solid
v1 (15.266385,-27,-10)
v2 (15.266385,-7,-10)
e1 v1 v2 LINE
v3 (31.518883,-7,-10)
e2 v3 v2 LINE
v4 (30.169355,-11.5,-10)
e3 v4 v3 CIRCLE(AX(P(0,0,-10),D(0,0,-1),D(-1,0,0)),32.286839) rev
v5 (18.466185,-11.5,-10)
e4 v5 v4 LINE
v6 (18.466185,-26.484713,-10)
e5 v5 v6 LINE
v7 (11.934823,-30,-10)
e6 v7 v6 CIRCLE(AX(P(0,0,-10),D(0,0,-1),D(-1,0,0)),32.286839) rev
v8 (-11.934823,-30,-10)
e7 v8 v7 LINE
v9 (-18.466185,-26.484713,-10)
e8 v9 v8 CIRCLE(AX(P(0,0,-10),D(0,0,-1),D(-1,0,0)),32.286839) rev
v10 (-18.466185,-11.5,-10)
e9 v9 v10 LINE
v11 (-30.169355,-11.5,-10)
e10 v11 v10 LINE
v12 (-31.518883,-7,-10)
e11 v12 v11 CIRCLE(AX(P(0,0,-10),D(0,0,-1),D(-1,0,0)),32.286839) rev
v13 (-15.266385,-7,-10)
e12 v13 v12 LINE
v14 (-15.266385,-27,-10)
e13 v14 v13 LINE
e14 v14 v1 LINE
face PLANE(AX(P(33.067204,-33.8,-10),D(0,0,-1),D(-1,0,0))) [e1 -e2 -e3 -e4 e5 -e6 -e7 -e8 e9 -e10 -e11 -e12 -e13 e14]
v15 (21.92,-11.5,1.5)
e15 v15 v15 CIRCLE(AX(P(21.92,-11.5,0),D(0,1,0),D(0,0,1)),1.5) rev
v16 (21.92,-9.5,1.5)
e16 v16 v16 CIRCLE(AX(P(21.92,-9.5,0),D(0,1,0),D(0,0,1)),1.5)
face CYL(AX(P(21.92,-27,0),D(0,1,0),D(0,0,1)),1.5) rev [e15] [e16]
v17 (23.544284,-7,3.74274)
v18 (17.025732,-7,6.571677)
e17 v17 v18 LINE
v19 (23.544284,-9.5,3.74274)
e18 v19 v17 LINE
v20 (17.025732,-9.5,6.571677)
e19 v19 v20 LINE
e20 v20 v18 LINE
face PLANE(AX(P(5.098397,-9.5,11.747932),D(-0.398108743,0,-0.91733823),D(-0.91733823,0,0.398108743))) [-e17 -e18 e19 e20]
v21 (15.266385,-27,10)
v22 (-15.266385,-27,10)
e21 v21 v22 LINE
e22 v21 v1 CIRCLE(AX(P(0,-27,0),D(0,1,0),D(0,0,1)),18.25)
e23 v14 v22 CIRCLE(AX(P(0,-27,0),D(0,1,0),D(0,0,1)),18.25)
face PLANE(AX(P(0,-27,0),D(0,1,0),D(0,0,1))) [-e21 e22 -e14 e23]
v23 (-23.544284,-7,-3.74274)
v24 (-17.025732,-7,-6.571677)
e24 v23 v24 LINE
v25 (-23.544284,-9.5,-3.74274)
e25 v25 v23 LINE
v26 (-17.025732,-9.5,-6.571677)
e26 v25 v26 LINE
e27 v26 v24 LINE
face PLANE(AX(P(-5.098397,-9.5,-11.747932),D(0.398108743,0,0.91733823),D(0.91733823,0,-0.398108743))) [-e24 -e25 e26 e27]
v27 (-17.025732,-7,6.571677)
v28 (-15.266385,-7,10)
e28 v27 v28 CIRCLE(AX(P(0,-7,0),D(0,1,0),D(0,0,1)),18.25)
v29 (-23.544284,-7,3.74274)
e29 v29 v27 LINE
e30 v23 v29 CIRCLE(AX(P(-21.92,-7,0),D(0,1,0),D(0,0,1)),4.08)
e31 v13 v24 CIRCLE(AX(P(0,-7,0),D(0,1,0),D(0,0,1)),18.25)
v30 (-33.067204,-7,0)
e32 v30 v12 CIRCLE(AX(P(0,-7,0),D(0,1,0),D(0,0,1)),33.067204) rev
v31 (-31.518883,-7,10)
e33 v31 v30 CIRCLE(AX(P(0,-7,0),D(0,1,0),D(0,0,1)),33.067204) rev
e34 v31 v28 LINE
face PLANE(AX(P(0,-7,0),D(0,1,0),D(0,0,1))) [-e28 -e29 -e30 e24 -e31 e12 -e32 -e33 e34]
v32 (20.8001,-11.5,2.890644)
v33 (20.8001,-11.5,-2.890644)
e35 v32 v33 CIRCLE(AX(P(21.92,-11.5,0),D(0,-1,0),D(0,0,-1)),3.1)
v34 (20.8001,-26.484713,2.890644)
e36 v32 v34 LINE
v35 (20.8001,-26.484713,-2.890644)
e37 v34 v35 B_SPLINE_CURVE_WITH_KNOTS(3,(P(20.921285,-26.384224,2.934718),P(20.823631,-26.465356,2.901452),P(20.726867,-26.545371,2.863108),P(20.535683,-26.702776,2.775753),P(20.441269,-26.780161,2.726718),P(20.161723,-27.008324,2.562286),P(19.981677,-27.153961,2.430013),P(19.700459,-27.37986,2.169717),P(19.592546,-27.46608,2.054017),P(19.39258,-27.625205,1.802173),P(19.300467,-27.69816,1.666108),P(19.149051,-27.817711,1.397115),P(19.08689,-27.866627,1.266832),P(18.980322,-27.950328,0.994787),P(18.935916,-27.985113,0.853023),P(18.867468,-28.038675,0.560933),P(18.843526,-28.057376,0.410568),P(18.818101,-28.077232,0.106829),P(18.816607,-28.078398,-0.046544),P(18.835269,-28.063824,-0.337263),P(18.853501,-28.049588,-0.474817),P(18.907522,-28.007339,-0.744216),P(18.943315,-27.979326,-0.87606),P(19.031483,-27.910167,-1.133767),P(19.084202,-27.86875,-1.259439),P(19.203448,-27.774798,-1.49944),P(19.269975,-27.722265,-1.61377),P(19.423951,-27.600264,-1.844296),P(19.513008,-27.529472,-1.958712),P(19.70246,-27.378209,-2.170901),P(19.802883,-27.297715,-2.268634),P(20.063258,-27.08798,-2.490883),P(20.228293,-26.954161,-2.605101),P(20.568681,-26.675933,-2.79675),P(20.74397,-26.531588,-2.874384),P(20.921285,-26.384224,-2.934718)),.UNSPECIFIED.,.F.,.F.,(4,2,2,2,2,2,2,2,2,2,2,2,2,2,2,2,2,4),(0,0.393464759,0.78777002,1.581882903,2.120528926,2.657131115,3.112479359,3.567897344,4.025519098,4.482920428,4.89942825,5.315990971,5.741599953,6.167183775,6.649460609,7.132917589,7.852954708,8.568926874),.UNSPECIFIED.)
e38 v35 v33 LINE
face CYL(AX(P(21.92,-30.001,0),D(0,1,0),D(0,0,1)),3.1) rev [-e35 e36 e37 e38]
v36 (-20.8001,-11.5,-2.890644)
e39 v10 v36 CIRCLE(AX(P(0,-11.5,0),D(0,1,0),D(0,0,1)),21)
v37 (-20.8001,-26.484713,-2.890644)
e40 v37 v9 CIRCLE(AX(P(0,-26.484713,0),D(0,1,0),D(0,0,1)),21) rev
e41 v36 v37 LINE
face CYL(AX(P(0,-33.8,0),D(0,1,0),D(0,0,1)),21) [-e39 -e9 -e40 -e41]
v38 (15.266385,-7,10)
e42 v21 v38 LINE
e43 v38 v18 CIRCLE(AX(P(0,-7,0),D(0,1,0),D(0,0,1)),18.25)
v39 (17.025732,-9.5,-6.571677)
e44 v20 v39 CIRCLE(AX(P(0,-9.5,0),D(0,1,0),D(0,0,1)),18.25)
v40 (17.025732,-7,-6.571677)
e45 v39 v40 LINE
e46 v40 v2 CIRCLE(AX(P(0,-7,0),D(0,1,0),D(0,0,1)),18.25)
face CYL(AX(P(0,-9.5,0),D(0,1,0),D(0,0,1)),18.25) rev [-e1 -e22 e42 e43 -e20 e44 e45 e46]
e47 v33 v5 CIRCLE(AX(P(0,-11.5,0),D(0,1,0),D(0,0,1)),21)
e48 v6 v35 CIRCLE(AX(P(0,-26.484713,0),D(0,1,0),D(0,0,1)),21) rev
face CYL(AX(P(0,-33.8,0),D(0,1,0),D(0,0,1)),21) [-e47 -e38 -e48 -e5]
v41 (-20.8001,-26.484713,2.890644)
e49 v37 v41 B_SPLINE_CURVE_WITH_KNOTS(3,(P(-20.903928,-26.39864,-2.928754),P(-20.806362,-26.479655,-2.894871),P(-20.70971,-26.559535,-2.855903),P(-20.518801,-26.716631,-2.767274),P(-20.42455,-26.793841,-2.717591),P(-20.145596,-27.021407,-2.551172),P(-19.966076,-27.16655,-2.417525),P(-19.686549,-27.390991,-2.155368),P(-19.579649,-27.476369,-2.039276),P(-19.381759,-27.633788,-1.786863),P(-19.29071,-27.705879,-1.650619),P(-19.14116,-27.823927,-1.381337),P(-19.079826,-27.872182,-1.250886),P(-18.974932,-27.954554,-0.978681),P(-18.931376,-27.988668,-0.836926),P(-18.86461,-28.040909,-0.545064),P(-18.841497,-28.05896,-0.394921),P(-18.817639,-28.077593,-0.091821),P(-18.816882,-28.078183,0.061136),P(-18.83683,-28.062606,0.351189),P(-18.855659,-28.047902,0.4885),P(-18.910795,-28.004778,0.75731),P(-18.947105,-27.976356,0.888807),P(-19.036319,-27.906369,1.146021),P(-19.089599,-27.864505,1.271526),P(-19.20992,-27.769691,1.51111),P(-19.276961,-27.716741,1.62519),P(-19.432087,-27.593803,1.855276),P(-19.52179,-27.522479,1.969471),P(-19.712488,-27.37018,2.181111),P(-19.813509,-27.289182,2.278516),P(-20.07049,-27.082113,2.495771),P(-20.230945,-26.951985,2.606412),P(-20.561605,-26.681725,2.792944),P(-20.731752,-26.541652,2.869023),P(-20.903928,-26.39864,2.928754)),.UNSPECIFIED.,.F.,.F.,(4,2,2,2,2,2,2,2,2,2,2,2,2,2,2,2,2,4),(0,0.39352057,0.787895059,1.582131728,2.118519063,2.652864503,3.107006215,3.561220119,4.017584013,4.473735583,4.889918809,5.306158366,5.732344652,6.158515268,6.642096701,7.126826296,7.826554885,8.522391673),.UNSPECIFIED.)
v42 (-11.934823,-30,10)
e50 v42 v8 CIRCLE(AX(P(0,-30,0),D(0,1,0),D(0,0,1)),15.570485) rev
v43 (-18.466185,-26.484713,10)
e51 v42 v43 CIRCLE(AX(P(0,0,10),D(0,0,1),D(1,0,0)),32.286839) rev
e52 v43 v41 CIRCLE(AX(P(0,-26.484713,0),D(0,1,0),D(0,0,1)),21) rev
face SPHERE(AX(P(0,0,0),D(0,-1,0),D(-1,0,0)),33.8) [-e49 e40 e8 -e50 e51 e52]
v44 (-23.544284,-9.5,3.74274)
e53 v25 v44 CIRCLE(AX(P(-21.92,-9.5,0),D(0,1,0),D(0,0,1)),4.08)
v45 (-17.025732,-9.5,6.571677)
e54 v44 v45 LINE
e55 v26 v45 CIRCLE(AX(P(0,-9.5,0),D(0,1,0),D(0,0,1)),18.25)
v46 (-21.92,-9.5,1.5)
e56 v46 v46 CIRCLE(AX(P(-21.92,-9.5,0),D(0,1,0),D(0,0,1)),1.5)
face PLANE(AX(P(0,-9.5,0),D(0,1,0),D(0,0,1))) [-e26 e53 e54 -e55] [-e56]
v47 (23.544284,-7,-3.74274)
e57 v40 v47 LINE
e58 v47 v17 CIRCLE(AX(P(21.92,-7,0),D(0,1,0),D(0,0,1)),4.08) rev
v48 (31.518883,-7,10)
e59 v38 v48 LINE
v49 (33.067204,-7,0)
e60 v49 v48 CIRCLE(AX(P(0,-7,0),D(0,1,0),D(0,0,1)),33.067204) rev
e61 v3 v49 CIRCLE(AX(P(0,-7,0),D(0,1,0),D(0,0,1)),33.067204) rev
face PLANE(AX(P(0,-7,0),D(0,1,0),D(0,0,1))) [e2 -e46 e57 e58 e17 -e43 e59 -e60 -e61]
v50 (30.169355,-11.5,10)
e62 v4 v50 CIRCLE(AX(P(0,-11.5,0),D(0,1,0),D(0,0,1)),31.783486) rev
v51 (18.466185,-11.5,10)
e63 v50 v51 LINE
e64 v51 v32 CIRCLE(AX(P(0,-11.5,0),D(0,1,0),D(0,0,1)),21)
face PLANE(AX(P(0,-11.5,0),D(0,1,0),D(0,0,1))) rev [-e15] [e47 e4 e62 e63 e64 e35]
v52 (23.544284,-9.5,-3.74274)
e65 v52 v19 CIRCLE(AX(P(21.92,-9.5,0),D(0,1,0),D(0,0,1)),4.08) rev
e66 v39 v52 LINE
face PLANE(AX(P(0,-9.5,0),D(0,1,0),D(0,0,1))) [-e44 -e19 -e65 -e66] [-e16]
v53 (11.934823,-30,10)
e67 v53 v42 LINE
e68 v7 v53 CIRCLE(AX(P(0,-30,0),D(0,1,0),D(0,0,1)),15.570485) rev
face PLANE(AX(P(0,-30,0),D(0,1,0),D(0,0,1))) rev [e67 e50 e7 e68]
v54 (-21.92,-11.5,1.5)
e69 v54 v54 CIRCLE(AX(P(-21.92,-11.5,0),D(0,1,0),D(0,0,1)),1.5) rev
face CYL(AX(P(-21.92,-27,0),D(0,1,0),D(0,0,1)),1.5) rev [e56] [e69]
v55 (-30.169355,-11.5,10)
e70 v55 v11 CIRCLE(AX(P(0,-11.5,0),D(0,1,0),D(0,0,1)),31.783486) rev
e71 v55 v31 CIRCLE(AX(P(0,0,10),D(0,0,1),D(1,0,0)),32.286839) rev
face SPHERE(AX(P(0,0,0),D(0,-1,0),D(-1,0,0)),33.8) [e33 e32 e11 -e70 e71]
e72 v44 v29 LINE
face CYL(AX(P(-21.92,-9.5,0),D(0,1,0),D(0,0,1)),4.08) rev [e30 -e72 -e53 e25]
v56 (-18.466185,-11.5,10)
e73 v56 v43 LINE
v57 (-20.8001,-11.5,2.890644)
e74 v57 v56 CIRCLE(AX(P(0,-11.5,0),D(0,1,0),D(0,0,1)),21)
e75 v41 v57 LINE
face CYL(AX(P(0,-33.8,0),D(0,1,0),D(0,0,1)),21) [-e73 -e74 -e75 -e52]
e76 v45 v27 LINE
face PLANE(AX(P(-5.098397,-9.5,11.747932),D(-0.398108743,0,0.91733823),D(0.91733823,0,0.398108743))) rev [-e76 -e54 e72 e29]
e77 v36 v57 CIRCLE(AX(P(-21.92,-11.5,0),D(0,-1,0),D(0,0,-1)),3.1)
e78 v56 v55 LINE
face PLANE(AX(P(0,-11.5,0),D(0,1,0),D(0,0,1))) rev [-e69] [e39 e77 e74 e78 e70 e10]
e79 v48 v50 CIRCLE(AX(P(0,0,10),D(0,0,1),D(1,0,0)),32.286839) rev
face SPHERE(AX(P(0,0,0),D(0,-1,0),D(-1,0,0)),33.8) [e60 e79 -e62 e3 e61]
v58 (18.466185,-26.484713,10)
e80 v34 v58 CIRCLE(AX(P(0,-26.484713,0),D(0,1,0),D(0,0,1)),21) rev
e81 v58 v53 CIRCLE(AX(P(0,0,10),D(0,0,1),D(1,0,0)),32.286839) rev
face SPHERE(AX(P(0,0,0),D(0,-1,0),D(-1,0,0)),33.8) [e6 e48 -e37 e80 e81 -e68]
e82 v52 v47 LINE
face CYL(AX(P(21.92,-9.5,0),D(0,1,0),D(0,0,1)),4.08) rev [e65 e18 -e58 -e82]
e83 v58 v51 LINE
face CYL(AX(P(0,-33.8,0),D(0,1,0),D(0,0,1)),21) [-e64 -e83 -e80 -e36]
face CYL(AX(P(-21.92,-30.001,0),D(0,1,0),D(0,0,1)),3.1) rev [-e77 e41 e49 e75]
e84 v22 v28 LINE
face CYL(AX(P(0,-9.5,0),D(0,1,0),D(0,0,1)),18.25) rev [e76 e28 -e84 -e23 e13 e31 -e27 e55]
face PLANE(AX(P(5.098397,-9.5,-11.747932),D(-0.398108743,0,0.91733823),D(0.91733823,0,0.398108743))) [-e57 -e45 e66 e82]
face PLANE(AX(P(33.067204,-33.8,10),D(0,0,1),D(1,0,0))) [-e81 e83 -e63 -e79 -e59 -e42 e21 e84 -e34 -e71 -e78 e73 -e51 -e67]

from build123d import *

# Parameters (mm, degrees)
SKETCH2_R               = 33.8
CUT_EXTRUDE1_DEPTH      = 7
SKETCH3_OUTSIDE_W       = 87.592
SKETCH3_OUTSIDE_H       = 87.592
SKETCH3_OUTSIDE_W_2     = 66.134408594
SKETCH3_OUTSIDE_H_2     = 20
CUT_EXTRUDE2_DEPTH      = 54.899165114
CUT_EXTRUDE3_DEPTH      = 2.5
SKETCH6_R               = 18.25
SKETCH6_R_2             = 1.5
CUT_EXTRUDE4_DEPTH      = 17.5
CUT_EXTRUDE5_START      = -19.484712572
CUT_EXTRUDE5_DEPTH      = 14.984712572
CUT_EXTRUDE6_START      = -3
SKETCH8_R               = 33.067204297
CUT_EXTRUDE6_DEPTH      = 37.917915802
CUT_EXTRUDE7_REACH      = 41.188
CUT_EXTRUDE7_END_RADIUS = 33.8
SKETCH9_R               = 3.1


# Read off the part's stored shape, not the designer's step: Cut-Extrude5
with BuildPart() as part:
    # Sketch1 → Revolve1 (revolve)
    with BuildSketch(Plane.XY, mode=Mode.PRIVATE) as revolve1_sk:
        with BuildLine():
            Line((0, -33.8), (0, 0))
            Line((0, 0), (33.8, 0))
            ThreePointArc((33.8, 0), (23.900209204, -23.900209204), (0, -33.8))
        make_face()
    revolve(revolve1_sk.sketch.rotate(Axis((0, -33.8, 0), (0, 1, 0)), 180), axis=Axis((0, -33.8, 0), (0, 1, 0)))

    # Sketch2 → Cut-Extrude1 (cut)
    with BuildSketch(Plane(origin=(0, 0, 0), x_dir=(1, 0, 0), z_dir=(0, 1, 0))):
        Circle(SKETCH2_R)
    extrude(amount=-CUT_EXTRUDE1_DEPTH, mode=Mode.SUBTRACT)

    # Sketch3 outside → Cut-Extrude2 (cut, through all)
    with BuildSketch(Plane(origin=(0, -7, 0), x_dir=(1, 0, 0), z_dir=(0, 1, 0))):
        Rectangle(SKETCH3_OUTSIDE_W, SKETCH3_OUTSIDE_H)
        Rectangle(SKETCH3_OUTSIDE_W_2, SKETCH3_OUTSIDE_H_2, mode=Mode.SUBTRACT)
    extrude(amount=-CUT_EXTRUDE2_DEPTH, mode=Mode.SUBTRACT)

    # Sketch5 → Cut-Extrude3 (cut)
    with BuildSketch(Plane(origin=(0, -7, 0), x_dir=(1, 0, 0), z_dir=(0, 1, 0))):
        with BuildLine():
            Line((-17.025732229, 6.571677263), (-23.544283672, 3.742739979))
            ThreePointArc((-23.544283672, 3.742739979), (-26, 0), (-23.544283672, -3.742739979))
            Line((-23.544283672, -3.742739979), (-17.025732229, -6.571677263))
            ThreePointArc((-17.025732229, -6.571677263), (0, -18.25), (17.025732229, -6.571677263))
            Line((17.025732229, -6.571677263), (23.544283672, -3.742739979))
            ThreePointArc((23.544283672, -3.742739979), (26, 0), (23.544283672, 3.742739979))
            Line((23.544283672, 3.742739979), (17.025732229, 6.571677263))
            ThreePointArc((17.025732229, 6.571677263), (0, 18.25), (-17.025732229, 6.571677263))
        make_face()
    extrude(amount=-CUT_EXTRUDE3_DEPTH, mode=Mode.SUBTRACT)

    # Sketch6 → Cut-Extrude4 (cut)
    with BuildSketch(Plane(origin=(0, -9.5, 0), x_dir=(1, 0, 0), z_dir=(0, 1, 0))):
        Circle(SKETCH6_R)
        with Locations(Location((-21.92, 0, 0), (0, 0, 270))):
            Circle(SKETCH6_R_2)
        with Locations(Location((21.92, 0, 0), (0, 0, 270))):
            Circle(SKETCH6_R_2)
    extrude(amount=-CUT_EXTRUDE4_DEPTH, mode=Mode.SUBTRACT)

    # Cut-Extrude5 outline → Cut-Extrude5 (cut)
    with BuildSketch(Plane(origin=(0, -7, 0), x_dir=(1, 0, 0), z_dir=(0, 1, 0)).offset(CUT_EXTRUDE5_START)):
        with BuildLine():
            ThreePointArc((20.967983577, -1.159165532), (20.206521411, -5.718084686), (18.466185313, -10))
            Line((18.466185313, -10), (33, -10))
            Line((33, -10), (33, 10))
            Line((33, 10), (18.466185313, 10))
            ThreePointArc((18.466185313, 10), (20.206521411, 5.718084686), (20.967983577, 1.159165532))
            ThreePointArc((20.967983577, 1.159165532), (23.42, 0), (20.967983577, -1.159165532))
        make_face()
        with BuildLine():
            ThreePointArc((-18.466185313, -10), (-20.206521411, -5.718084686), (-20.967983577, -1.159165532))
            ThreePointArc((-20.967983577, -1.159165532), (-23.42, 0), (-20.967983577, 1.159165532))
            ThreePointArc((-20.967983577, 1.159165532), (-20.206521411, 5.718084686), (-18.466185313, 10))
            Line((-18.466185313, 10), (-33, 10))
            Line((-33, 10), (-33, -10))
            Line((-33, -10), (-18.466185313, -10))
        make_face()
    extrude(amount=CUT_EXTRUDE5_DEPTH, mode=Mode.SUBTRACT)

    # Sketch8 → Cut-Extrude6 (cut, through all)
    with BuildSketch(Plane(origin=(0, -27, 0), x_dir=(1, 0, 0), z_dir=(0, 1, 0)).offset(CUT_EXTRUDE6_START)):
        Circle(SKETCH8_R)
    extrude(amount=-CUT_EXTRUDE6_DEPTH, mode=Mode.SUBTRACT)

    # Cut-Extrude7: up to this sphere (the profile starts inside it)
    cut_extrude7_end = Location((0, 0, 0)) * Sphere(CUT_EXTRUDE7_END_RADIUS, mode=Mode.PRIVATE)
    # Sketch9 → Cut-Extrude7 (cut, up to the surface)
    with BuildSketch(Plane.XZ.offset(11.5), mode=Mode.PRIVATE) as cut_extrude7_sk1:
        with Locations((-21.92, 0)):
            Circle(SKETCH9_R)
    cut_extrude7_tool1 = extrude(cut_extrude7_sk1.sketch, amount=CUT_EXTRUDE7_REACH, mode=Mode.PRIVATE) & cut_extrude7_end
    add(cut_extrude7_tool1.solids().sort_by_distance((-21.92, -11.5, 0))[0], mode=Mode.SUBTRACT)
    # Sketch9 → Cut-Extrude7 (cut, up to the surface)
    with BuildSketch(Plane.XZ.offset(11.5), mode=Mode.PRIVATE) as cut_extrude7_sk2:
        with Locations((21.92, 0)):
            Circle(SKETCH9_R)
    cut_extrude7_tool2 = extrude(cut_extrude7_sk2.sketch, amount=CUT_EXTRUDE7_REACH, mode=Mode.PRIVATE) & cut_extrude7_end
    add(cut_extrude7_tool2.solids().sort_by_distance((21.92, -11.5, 0))[0], mode=Mode.SUBTRACT)


solid = part.part
